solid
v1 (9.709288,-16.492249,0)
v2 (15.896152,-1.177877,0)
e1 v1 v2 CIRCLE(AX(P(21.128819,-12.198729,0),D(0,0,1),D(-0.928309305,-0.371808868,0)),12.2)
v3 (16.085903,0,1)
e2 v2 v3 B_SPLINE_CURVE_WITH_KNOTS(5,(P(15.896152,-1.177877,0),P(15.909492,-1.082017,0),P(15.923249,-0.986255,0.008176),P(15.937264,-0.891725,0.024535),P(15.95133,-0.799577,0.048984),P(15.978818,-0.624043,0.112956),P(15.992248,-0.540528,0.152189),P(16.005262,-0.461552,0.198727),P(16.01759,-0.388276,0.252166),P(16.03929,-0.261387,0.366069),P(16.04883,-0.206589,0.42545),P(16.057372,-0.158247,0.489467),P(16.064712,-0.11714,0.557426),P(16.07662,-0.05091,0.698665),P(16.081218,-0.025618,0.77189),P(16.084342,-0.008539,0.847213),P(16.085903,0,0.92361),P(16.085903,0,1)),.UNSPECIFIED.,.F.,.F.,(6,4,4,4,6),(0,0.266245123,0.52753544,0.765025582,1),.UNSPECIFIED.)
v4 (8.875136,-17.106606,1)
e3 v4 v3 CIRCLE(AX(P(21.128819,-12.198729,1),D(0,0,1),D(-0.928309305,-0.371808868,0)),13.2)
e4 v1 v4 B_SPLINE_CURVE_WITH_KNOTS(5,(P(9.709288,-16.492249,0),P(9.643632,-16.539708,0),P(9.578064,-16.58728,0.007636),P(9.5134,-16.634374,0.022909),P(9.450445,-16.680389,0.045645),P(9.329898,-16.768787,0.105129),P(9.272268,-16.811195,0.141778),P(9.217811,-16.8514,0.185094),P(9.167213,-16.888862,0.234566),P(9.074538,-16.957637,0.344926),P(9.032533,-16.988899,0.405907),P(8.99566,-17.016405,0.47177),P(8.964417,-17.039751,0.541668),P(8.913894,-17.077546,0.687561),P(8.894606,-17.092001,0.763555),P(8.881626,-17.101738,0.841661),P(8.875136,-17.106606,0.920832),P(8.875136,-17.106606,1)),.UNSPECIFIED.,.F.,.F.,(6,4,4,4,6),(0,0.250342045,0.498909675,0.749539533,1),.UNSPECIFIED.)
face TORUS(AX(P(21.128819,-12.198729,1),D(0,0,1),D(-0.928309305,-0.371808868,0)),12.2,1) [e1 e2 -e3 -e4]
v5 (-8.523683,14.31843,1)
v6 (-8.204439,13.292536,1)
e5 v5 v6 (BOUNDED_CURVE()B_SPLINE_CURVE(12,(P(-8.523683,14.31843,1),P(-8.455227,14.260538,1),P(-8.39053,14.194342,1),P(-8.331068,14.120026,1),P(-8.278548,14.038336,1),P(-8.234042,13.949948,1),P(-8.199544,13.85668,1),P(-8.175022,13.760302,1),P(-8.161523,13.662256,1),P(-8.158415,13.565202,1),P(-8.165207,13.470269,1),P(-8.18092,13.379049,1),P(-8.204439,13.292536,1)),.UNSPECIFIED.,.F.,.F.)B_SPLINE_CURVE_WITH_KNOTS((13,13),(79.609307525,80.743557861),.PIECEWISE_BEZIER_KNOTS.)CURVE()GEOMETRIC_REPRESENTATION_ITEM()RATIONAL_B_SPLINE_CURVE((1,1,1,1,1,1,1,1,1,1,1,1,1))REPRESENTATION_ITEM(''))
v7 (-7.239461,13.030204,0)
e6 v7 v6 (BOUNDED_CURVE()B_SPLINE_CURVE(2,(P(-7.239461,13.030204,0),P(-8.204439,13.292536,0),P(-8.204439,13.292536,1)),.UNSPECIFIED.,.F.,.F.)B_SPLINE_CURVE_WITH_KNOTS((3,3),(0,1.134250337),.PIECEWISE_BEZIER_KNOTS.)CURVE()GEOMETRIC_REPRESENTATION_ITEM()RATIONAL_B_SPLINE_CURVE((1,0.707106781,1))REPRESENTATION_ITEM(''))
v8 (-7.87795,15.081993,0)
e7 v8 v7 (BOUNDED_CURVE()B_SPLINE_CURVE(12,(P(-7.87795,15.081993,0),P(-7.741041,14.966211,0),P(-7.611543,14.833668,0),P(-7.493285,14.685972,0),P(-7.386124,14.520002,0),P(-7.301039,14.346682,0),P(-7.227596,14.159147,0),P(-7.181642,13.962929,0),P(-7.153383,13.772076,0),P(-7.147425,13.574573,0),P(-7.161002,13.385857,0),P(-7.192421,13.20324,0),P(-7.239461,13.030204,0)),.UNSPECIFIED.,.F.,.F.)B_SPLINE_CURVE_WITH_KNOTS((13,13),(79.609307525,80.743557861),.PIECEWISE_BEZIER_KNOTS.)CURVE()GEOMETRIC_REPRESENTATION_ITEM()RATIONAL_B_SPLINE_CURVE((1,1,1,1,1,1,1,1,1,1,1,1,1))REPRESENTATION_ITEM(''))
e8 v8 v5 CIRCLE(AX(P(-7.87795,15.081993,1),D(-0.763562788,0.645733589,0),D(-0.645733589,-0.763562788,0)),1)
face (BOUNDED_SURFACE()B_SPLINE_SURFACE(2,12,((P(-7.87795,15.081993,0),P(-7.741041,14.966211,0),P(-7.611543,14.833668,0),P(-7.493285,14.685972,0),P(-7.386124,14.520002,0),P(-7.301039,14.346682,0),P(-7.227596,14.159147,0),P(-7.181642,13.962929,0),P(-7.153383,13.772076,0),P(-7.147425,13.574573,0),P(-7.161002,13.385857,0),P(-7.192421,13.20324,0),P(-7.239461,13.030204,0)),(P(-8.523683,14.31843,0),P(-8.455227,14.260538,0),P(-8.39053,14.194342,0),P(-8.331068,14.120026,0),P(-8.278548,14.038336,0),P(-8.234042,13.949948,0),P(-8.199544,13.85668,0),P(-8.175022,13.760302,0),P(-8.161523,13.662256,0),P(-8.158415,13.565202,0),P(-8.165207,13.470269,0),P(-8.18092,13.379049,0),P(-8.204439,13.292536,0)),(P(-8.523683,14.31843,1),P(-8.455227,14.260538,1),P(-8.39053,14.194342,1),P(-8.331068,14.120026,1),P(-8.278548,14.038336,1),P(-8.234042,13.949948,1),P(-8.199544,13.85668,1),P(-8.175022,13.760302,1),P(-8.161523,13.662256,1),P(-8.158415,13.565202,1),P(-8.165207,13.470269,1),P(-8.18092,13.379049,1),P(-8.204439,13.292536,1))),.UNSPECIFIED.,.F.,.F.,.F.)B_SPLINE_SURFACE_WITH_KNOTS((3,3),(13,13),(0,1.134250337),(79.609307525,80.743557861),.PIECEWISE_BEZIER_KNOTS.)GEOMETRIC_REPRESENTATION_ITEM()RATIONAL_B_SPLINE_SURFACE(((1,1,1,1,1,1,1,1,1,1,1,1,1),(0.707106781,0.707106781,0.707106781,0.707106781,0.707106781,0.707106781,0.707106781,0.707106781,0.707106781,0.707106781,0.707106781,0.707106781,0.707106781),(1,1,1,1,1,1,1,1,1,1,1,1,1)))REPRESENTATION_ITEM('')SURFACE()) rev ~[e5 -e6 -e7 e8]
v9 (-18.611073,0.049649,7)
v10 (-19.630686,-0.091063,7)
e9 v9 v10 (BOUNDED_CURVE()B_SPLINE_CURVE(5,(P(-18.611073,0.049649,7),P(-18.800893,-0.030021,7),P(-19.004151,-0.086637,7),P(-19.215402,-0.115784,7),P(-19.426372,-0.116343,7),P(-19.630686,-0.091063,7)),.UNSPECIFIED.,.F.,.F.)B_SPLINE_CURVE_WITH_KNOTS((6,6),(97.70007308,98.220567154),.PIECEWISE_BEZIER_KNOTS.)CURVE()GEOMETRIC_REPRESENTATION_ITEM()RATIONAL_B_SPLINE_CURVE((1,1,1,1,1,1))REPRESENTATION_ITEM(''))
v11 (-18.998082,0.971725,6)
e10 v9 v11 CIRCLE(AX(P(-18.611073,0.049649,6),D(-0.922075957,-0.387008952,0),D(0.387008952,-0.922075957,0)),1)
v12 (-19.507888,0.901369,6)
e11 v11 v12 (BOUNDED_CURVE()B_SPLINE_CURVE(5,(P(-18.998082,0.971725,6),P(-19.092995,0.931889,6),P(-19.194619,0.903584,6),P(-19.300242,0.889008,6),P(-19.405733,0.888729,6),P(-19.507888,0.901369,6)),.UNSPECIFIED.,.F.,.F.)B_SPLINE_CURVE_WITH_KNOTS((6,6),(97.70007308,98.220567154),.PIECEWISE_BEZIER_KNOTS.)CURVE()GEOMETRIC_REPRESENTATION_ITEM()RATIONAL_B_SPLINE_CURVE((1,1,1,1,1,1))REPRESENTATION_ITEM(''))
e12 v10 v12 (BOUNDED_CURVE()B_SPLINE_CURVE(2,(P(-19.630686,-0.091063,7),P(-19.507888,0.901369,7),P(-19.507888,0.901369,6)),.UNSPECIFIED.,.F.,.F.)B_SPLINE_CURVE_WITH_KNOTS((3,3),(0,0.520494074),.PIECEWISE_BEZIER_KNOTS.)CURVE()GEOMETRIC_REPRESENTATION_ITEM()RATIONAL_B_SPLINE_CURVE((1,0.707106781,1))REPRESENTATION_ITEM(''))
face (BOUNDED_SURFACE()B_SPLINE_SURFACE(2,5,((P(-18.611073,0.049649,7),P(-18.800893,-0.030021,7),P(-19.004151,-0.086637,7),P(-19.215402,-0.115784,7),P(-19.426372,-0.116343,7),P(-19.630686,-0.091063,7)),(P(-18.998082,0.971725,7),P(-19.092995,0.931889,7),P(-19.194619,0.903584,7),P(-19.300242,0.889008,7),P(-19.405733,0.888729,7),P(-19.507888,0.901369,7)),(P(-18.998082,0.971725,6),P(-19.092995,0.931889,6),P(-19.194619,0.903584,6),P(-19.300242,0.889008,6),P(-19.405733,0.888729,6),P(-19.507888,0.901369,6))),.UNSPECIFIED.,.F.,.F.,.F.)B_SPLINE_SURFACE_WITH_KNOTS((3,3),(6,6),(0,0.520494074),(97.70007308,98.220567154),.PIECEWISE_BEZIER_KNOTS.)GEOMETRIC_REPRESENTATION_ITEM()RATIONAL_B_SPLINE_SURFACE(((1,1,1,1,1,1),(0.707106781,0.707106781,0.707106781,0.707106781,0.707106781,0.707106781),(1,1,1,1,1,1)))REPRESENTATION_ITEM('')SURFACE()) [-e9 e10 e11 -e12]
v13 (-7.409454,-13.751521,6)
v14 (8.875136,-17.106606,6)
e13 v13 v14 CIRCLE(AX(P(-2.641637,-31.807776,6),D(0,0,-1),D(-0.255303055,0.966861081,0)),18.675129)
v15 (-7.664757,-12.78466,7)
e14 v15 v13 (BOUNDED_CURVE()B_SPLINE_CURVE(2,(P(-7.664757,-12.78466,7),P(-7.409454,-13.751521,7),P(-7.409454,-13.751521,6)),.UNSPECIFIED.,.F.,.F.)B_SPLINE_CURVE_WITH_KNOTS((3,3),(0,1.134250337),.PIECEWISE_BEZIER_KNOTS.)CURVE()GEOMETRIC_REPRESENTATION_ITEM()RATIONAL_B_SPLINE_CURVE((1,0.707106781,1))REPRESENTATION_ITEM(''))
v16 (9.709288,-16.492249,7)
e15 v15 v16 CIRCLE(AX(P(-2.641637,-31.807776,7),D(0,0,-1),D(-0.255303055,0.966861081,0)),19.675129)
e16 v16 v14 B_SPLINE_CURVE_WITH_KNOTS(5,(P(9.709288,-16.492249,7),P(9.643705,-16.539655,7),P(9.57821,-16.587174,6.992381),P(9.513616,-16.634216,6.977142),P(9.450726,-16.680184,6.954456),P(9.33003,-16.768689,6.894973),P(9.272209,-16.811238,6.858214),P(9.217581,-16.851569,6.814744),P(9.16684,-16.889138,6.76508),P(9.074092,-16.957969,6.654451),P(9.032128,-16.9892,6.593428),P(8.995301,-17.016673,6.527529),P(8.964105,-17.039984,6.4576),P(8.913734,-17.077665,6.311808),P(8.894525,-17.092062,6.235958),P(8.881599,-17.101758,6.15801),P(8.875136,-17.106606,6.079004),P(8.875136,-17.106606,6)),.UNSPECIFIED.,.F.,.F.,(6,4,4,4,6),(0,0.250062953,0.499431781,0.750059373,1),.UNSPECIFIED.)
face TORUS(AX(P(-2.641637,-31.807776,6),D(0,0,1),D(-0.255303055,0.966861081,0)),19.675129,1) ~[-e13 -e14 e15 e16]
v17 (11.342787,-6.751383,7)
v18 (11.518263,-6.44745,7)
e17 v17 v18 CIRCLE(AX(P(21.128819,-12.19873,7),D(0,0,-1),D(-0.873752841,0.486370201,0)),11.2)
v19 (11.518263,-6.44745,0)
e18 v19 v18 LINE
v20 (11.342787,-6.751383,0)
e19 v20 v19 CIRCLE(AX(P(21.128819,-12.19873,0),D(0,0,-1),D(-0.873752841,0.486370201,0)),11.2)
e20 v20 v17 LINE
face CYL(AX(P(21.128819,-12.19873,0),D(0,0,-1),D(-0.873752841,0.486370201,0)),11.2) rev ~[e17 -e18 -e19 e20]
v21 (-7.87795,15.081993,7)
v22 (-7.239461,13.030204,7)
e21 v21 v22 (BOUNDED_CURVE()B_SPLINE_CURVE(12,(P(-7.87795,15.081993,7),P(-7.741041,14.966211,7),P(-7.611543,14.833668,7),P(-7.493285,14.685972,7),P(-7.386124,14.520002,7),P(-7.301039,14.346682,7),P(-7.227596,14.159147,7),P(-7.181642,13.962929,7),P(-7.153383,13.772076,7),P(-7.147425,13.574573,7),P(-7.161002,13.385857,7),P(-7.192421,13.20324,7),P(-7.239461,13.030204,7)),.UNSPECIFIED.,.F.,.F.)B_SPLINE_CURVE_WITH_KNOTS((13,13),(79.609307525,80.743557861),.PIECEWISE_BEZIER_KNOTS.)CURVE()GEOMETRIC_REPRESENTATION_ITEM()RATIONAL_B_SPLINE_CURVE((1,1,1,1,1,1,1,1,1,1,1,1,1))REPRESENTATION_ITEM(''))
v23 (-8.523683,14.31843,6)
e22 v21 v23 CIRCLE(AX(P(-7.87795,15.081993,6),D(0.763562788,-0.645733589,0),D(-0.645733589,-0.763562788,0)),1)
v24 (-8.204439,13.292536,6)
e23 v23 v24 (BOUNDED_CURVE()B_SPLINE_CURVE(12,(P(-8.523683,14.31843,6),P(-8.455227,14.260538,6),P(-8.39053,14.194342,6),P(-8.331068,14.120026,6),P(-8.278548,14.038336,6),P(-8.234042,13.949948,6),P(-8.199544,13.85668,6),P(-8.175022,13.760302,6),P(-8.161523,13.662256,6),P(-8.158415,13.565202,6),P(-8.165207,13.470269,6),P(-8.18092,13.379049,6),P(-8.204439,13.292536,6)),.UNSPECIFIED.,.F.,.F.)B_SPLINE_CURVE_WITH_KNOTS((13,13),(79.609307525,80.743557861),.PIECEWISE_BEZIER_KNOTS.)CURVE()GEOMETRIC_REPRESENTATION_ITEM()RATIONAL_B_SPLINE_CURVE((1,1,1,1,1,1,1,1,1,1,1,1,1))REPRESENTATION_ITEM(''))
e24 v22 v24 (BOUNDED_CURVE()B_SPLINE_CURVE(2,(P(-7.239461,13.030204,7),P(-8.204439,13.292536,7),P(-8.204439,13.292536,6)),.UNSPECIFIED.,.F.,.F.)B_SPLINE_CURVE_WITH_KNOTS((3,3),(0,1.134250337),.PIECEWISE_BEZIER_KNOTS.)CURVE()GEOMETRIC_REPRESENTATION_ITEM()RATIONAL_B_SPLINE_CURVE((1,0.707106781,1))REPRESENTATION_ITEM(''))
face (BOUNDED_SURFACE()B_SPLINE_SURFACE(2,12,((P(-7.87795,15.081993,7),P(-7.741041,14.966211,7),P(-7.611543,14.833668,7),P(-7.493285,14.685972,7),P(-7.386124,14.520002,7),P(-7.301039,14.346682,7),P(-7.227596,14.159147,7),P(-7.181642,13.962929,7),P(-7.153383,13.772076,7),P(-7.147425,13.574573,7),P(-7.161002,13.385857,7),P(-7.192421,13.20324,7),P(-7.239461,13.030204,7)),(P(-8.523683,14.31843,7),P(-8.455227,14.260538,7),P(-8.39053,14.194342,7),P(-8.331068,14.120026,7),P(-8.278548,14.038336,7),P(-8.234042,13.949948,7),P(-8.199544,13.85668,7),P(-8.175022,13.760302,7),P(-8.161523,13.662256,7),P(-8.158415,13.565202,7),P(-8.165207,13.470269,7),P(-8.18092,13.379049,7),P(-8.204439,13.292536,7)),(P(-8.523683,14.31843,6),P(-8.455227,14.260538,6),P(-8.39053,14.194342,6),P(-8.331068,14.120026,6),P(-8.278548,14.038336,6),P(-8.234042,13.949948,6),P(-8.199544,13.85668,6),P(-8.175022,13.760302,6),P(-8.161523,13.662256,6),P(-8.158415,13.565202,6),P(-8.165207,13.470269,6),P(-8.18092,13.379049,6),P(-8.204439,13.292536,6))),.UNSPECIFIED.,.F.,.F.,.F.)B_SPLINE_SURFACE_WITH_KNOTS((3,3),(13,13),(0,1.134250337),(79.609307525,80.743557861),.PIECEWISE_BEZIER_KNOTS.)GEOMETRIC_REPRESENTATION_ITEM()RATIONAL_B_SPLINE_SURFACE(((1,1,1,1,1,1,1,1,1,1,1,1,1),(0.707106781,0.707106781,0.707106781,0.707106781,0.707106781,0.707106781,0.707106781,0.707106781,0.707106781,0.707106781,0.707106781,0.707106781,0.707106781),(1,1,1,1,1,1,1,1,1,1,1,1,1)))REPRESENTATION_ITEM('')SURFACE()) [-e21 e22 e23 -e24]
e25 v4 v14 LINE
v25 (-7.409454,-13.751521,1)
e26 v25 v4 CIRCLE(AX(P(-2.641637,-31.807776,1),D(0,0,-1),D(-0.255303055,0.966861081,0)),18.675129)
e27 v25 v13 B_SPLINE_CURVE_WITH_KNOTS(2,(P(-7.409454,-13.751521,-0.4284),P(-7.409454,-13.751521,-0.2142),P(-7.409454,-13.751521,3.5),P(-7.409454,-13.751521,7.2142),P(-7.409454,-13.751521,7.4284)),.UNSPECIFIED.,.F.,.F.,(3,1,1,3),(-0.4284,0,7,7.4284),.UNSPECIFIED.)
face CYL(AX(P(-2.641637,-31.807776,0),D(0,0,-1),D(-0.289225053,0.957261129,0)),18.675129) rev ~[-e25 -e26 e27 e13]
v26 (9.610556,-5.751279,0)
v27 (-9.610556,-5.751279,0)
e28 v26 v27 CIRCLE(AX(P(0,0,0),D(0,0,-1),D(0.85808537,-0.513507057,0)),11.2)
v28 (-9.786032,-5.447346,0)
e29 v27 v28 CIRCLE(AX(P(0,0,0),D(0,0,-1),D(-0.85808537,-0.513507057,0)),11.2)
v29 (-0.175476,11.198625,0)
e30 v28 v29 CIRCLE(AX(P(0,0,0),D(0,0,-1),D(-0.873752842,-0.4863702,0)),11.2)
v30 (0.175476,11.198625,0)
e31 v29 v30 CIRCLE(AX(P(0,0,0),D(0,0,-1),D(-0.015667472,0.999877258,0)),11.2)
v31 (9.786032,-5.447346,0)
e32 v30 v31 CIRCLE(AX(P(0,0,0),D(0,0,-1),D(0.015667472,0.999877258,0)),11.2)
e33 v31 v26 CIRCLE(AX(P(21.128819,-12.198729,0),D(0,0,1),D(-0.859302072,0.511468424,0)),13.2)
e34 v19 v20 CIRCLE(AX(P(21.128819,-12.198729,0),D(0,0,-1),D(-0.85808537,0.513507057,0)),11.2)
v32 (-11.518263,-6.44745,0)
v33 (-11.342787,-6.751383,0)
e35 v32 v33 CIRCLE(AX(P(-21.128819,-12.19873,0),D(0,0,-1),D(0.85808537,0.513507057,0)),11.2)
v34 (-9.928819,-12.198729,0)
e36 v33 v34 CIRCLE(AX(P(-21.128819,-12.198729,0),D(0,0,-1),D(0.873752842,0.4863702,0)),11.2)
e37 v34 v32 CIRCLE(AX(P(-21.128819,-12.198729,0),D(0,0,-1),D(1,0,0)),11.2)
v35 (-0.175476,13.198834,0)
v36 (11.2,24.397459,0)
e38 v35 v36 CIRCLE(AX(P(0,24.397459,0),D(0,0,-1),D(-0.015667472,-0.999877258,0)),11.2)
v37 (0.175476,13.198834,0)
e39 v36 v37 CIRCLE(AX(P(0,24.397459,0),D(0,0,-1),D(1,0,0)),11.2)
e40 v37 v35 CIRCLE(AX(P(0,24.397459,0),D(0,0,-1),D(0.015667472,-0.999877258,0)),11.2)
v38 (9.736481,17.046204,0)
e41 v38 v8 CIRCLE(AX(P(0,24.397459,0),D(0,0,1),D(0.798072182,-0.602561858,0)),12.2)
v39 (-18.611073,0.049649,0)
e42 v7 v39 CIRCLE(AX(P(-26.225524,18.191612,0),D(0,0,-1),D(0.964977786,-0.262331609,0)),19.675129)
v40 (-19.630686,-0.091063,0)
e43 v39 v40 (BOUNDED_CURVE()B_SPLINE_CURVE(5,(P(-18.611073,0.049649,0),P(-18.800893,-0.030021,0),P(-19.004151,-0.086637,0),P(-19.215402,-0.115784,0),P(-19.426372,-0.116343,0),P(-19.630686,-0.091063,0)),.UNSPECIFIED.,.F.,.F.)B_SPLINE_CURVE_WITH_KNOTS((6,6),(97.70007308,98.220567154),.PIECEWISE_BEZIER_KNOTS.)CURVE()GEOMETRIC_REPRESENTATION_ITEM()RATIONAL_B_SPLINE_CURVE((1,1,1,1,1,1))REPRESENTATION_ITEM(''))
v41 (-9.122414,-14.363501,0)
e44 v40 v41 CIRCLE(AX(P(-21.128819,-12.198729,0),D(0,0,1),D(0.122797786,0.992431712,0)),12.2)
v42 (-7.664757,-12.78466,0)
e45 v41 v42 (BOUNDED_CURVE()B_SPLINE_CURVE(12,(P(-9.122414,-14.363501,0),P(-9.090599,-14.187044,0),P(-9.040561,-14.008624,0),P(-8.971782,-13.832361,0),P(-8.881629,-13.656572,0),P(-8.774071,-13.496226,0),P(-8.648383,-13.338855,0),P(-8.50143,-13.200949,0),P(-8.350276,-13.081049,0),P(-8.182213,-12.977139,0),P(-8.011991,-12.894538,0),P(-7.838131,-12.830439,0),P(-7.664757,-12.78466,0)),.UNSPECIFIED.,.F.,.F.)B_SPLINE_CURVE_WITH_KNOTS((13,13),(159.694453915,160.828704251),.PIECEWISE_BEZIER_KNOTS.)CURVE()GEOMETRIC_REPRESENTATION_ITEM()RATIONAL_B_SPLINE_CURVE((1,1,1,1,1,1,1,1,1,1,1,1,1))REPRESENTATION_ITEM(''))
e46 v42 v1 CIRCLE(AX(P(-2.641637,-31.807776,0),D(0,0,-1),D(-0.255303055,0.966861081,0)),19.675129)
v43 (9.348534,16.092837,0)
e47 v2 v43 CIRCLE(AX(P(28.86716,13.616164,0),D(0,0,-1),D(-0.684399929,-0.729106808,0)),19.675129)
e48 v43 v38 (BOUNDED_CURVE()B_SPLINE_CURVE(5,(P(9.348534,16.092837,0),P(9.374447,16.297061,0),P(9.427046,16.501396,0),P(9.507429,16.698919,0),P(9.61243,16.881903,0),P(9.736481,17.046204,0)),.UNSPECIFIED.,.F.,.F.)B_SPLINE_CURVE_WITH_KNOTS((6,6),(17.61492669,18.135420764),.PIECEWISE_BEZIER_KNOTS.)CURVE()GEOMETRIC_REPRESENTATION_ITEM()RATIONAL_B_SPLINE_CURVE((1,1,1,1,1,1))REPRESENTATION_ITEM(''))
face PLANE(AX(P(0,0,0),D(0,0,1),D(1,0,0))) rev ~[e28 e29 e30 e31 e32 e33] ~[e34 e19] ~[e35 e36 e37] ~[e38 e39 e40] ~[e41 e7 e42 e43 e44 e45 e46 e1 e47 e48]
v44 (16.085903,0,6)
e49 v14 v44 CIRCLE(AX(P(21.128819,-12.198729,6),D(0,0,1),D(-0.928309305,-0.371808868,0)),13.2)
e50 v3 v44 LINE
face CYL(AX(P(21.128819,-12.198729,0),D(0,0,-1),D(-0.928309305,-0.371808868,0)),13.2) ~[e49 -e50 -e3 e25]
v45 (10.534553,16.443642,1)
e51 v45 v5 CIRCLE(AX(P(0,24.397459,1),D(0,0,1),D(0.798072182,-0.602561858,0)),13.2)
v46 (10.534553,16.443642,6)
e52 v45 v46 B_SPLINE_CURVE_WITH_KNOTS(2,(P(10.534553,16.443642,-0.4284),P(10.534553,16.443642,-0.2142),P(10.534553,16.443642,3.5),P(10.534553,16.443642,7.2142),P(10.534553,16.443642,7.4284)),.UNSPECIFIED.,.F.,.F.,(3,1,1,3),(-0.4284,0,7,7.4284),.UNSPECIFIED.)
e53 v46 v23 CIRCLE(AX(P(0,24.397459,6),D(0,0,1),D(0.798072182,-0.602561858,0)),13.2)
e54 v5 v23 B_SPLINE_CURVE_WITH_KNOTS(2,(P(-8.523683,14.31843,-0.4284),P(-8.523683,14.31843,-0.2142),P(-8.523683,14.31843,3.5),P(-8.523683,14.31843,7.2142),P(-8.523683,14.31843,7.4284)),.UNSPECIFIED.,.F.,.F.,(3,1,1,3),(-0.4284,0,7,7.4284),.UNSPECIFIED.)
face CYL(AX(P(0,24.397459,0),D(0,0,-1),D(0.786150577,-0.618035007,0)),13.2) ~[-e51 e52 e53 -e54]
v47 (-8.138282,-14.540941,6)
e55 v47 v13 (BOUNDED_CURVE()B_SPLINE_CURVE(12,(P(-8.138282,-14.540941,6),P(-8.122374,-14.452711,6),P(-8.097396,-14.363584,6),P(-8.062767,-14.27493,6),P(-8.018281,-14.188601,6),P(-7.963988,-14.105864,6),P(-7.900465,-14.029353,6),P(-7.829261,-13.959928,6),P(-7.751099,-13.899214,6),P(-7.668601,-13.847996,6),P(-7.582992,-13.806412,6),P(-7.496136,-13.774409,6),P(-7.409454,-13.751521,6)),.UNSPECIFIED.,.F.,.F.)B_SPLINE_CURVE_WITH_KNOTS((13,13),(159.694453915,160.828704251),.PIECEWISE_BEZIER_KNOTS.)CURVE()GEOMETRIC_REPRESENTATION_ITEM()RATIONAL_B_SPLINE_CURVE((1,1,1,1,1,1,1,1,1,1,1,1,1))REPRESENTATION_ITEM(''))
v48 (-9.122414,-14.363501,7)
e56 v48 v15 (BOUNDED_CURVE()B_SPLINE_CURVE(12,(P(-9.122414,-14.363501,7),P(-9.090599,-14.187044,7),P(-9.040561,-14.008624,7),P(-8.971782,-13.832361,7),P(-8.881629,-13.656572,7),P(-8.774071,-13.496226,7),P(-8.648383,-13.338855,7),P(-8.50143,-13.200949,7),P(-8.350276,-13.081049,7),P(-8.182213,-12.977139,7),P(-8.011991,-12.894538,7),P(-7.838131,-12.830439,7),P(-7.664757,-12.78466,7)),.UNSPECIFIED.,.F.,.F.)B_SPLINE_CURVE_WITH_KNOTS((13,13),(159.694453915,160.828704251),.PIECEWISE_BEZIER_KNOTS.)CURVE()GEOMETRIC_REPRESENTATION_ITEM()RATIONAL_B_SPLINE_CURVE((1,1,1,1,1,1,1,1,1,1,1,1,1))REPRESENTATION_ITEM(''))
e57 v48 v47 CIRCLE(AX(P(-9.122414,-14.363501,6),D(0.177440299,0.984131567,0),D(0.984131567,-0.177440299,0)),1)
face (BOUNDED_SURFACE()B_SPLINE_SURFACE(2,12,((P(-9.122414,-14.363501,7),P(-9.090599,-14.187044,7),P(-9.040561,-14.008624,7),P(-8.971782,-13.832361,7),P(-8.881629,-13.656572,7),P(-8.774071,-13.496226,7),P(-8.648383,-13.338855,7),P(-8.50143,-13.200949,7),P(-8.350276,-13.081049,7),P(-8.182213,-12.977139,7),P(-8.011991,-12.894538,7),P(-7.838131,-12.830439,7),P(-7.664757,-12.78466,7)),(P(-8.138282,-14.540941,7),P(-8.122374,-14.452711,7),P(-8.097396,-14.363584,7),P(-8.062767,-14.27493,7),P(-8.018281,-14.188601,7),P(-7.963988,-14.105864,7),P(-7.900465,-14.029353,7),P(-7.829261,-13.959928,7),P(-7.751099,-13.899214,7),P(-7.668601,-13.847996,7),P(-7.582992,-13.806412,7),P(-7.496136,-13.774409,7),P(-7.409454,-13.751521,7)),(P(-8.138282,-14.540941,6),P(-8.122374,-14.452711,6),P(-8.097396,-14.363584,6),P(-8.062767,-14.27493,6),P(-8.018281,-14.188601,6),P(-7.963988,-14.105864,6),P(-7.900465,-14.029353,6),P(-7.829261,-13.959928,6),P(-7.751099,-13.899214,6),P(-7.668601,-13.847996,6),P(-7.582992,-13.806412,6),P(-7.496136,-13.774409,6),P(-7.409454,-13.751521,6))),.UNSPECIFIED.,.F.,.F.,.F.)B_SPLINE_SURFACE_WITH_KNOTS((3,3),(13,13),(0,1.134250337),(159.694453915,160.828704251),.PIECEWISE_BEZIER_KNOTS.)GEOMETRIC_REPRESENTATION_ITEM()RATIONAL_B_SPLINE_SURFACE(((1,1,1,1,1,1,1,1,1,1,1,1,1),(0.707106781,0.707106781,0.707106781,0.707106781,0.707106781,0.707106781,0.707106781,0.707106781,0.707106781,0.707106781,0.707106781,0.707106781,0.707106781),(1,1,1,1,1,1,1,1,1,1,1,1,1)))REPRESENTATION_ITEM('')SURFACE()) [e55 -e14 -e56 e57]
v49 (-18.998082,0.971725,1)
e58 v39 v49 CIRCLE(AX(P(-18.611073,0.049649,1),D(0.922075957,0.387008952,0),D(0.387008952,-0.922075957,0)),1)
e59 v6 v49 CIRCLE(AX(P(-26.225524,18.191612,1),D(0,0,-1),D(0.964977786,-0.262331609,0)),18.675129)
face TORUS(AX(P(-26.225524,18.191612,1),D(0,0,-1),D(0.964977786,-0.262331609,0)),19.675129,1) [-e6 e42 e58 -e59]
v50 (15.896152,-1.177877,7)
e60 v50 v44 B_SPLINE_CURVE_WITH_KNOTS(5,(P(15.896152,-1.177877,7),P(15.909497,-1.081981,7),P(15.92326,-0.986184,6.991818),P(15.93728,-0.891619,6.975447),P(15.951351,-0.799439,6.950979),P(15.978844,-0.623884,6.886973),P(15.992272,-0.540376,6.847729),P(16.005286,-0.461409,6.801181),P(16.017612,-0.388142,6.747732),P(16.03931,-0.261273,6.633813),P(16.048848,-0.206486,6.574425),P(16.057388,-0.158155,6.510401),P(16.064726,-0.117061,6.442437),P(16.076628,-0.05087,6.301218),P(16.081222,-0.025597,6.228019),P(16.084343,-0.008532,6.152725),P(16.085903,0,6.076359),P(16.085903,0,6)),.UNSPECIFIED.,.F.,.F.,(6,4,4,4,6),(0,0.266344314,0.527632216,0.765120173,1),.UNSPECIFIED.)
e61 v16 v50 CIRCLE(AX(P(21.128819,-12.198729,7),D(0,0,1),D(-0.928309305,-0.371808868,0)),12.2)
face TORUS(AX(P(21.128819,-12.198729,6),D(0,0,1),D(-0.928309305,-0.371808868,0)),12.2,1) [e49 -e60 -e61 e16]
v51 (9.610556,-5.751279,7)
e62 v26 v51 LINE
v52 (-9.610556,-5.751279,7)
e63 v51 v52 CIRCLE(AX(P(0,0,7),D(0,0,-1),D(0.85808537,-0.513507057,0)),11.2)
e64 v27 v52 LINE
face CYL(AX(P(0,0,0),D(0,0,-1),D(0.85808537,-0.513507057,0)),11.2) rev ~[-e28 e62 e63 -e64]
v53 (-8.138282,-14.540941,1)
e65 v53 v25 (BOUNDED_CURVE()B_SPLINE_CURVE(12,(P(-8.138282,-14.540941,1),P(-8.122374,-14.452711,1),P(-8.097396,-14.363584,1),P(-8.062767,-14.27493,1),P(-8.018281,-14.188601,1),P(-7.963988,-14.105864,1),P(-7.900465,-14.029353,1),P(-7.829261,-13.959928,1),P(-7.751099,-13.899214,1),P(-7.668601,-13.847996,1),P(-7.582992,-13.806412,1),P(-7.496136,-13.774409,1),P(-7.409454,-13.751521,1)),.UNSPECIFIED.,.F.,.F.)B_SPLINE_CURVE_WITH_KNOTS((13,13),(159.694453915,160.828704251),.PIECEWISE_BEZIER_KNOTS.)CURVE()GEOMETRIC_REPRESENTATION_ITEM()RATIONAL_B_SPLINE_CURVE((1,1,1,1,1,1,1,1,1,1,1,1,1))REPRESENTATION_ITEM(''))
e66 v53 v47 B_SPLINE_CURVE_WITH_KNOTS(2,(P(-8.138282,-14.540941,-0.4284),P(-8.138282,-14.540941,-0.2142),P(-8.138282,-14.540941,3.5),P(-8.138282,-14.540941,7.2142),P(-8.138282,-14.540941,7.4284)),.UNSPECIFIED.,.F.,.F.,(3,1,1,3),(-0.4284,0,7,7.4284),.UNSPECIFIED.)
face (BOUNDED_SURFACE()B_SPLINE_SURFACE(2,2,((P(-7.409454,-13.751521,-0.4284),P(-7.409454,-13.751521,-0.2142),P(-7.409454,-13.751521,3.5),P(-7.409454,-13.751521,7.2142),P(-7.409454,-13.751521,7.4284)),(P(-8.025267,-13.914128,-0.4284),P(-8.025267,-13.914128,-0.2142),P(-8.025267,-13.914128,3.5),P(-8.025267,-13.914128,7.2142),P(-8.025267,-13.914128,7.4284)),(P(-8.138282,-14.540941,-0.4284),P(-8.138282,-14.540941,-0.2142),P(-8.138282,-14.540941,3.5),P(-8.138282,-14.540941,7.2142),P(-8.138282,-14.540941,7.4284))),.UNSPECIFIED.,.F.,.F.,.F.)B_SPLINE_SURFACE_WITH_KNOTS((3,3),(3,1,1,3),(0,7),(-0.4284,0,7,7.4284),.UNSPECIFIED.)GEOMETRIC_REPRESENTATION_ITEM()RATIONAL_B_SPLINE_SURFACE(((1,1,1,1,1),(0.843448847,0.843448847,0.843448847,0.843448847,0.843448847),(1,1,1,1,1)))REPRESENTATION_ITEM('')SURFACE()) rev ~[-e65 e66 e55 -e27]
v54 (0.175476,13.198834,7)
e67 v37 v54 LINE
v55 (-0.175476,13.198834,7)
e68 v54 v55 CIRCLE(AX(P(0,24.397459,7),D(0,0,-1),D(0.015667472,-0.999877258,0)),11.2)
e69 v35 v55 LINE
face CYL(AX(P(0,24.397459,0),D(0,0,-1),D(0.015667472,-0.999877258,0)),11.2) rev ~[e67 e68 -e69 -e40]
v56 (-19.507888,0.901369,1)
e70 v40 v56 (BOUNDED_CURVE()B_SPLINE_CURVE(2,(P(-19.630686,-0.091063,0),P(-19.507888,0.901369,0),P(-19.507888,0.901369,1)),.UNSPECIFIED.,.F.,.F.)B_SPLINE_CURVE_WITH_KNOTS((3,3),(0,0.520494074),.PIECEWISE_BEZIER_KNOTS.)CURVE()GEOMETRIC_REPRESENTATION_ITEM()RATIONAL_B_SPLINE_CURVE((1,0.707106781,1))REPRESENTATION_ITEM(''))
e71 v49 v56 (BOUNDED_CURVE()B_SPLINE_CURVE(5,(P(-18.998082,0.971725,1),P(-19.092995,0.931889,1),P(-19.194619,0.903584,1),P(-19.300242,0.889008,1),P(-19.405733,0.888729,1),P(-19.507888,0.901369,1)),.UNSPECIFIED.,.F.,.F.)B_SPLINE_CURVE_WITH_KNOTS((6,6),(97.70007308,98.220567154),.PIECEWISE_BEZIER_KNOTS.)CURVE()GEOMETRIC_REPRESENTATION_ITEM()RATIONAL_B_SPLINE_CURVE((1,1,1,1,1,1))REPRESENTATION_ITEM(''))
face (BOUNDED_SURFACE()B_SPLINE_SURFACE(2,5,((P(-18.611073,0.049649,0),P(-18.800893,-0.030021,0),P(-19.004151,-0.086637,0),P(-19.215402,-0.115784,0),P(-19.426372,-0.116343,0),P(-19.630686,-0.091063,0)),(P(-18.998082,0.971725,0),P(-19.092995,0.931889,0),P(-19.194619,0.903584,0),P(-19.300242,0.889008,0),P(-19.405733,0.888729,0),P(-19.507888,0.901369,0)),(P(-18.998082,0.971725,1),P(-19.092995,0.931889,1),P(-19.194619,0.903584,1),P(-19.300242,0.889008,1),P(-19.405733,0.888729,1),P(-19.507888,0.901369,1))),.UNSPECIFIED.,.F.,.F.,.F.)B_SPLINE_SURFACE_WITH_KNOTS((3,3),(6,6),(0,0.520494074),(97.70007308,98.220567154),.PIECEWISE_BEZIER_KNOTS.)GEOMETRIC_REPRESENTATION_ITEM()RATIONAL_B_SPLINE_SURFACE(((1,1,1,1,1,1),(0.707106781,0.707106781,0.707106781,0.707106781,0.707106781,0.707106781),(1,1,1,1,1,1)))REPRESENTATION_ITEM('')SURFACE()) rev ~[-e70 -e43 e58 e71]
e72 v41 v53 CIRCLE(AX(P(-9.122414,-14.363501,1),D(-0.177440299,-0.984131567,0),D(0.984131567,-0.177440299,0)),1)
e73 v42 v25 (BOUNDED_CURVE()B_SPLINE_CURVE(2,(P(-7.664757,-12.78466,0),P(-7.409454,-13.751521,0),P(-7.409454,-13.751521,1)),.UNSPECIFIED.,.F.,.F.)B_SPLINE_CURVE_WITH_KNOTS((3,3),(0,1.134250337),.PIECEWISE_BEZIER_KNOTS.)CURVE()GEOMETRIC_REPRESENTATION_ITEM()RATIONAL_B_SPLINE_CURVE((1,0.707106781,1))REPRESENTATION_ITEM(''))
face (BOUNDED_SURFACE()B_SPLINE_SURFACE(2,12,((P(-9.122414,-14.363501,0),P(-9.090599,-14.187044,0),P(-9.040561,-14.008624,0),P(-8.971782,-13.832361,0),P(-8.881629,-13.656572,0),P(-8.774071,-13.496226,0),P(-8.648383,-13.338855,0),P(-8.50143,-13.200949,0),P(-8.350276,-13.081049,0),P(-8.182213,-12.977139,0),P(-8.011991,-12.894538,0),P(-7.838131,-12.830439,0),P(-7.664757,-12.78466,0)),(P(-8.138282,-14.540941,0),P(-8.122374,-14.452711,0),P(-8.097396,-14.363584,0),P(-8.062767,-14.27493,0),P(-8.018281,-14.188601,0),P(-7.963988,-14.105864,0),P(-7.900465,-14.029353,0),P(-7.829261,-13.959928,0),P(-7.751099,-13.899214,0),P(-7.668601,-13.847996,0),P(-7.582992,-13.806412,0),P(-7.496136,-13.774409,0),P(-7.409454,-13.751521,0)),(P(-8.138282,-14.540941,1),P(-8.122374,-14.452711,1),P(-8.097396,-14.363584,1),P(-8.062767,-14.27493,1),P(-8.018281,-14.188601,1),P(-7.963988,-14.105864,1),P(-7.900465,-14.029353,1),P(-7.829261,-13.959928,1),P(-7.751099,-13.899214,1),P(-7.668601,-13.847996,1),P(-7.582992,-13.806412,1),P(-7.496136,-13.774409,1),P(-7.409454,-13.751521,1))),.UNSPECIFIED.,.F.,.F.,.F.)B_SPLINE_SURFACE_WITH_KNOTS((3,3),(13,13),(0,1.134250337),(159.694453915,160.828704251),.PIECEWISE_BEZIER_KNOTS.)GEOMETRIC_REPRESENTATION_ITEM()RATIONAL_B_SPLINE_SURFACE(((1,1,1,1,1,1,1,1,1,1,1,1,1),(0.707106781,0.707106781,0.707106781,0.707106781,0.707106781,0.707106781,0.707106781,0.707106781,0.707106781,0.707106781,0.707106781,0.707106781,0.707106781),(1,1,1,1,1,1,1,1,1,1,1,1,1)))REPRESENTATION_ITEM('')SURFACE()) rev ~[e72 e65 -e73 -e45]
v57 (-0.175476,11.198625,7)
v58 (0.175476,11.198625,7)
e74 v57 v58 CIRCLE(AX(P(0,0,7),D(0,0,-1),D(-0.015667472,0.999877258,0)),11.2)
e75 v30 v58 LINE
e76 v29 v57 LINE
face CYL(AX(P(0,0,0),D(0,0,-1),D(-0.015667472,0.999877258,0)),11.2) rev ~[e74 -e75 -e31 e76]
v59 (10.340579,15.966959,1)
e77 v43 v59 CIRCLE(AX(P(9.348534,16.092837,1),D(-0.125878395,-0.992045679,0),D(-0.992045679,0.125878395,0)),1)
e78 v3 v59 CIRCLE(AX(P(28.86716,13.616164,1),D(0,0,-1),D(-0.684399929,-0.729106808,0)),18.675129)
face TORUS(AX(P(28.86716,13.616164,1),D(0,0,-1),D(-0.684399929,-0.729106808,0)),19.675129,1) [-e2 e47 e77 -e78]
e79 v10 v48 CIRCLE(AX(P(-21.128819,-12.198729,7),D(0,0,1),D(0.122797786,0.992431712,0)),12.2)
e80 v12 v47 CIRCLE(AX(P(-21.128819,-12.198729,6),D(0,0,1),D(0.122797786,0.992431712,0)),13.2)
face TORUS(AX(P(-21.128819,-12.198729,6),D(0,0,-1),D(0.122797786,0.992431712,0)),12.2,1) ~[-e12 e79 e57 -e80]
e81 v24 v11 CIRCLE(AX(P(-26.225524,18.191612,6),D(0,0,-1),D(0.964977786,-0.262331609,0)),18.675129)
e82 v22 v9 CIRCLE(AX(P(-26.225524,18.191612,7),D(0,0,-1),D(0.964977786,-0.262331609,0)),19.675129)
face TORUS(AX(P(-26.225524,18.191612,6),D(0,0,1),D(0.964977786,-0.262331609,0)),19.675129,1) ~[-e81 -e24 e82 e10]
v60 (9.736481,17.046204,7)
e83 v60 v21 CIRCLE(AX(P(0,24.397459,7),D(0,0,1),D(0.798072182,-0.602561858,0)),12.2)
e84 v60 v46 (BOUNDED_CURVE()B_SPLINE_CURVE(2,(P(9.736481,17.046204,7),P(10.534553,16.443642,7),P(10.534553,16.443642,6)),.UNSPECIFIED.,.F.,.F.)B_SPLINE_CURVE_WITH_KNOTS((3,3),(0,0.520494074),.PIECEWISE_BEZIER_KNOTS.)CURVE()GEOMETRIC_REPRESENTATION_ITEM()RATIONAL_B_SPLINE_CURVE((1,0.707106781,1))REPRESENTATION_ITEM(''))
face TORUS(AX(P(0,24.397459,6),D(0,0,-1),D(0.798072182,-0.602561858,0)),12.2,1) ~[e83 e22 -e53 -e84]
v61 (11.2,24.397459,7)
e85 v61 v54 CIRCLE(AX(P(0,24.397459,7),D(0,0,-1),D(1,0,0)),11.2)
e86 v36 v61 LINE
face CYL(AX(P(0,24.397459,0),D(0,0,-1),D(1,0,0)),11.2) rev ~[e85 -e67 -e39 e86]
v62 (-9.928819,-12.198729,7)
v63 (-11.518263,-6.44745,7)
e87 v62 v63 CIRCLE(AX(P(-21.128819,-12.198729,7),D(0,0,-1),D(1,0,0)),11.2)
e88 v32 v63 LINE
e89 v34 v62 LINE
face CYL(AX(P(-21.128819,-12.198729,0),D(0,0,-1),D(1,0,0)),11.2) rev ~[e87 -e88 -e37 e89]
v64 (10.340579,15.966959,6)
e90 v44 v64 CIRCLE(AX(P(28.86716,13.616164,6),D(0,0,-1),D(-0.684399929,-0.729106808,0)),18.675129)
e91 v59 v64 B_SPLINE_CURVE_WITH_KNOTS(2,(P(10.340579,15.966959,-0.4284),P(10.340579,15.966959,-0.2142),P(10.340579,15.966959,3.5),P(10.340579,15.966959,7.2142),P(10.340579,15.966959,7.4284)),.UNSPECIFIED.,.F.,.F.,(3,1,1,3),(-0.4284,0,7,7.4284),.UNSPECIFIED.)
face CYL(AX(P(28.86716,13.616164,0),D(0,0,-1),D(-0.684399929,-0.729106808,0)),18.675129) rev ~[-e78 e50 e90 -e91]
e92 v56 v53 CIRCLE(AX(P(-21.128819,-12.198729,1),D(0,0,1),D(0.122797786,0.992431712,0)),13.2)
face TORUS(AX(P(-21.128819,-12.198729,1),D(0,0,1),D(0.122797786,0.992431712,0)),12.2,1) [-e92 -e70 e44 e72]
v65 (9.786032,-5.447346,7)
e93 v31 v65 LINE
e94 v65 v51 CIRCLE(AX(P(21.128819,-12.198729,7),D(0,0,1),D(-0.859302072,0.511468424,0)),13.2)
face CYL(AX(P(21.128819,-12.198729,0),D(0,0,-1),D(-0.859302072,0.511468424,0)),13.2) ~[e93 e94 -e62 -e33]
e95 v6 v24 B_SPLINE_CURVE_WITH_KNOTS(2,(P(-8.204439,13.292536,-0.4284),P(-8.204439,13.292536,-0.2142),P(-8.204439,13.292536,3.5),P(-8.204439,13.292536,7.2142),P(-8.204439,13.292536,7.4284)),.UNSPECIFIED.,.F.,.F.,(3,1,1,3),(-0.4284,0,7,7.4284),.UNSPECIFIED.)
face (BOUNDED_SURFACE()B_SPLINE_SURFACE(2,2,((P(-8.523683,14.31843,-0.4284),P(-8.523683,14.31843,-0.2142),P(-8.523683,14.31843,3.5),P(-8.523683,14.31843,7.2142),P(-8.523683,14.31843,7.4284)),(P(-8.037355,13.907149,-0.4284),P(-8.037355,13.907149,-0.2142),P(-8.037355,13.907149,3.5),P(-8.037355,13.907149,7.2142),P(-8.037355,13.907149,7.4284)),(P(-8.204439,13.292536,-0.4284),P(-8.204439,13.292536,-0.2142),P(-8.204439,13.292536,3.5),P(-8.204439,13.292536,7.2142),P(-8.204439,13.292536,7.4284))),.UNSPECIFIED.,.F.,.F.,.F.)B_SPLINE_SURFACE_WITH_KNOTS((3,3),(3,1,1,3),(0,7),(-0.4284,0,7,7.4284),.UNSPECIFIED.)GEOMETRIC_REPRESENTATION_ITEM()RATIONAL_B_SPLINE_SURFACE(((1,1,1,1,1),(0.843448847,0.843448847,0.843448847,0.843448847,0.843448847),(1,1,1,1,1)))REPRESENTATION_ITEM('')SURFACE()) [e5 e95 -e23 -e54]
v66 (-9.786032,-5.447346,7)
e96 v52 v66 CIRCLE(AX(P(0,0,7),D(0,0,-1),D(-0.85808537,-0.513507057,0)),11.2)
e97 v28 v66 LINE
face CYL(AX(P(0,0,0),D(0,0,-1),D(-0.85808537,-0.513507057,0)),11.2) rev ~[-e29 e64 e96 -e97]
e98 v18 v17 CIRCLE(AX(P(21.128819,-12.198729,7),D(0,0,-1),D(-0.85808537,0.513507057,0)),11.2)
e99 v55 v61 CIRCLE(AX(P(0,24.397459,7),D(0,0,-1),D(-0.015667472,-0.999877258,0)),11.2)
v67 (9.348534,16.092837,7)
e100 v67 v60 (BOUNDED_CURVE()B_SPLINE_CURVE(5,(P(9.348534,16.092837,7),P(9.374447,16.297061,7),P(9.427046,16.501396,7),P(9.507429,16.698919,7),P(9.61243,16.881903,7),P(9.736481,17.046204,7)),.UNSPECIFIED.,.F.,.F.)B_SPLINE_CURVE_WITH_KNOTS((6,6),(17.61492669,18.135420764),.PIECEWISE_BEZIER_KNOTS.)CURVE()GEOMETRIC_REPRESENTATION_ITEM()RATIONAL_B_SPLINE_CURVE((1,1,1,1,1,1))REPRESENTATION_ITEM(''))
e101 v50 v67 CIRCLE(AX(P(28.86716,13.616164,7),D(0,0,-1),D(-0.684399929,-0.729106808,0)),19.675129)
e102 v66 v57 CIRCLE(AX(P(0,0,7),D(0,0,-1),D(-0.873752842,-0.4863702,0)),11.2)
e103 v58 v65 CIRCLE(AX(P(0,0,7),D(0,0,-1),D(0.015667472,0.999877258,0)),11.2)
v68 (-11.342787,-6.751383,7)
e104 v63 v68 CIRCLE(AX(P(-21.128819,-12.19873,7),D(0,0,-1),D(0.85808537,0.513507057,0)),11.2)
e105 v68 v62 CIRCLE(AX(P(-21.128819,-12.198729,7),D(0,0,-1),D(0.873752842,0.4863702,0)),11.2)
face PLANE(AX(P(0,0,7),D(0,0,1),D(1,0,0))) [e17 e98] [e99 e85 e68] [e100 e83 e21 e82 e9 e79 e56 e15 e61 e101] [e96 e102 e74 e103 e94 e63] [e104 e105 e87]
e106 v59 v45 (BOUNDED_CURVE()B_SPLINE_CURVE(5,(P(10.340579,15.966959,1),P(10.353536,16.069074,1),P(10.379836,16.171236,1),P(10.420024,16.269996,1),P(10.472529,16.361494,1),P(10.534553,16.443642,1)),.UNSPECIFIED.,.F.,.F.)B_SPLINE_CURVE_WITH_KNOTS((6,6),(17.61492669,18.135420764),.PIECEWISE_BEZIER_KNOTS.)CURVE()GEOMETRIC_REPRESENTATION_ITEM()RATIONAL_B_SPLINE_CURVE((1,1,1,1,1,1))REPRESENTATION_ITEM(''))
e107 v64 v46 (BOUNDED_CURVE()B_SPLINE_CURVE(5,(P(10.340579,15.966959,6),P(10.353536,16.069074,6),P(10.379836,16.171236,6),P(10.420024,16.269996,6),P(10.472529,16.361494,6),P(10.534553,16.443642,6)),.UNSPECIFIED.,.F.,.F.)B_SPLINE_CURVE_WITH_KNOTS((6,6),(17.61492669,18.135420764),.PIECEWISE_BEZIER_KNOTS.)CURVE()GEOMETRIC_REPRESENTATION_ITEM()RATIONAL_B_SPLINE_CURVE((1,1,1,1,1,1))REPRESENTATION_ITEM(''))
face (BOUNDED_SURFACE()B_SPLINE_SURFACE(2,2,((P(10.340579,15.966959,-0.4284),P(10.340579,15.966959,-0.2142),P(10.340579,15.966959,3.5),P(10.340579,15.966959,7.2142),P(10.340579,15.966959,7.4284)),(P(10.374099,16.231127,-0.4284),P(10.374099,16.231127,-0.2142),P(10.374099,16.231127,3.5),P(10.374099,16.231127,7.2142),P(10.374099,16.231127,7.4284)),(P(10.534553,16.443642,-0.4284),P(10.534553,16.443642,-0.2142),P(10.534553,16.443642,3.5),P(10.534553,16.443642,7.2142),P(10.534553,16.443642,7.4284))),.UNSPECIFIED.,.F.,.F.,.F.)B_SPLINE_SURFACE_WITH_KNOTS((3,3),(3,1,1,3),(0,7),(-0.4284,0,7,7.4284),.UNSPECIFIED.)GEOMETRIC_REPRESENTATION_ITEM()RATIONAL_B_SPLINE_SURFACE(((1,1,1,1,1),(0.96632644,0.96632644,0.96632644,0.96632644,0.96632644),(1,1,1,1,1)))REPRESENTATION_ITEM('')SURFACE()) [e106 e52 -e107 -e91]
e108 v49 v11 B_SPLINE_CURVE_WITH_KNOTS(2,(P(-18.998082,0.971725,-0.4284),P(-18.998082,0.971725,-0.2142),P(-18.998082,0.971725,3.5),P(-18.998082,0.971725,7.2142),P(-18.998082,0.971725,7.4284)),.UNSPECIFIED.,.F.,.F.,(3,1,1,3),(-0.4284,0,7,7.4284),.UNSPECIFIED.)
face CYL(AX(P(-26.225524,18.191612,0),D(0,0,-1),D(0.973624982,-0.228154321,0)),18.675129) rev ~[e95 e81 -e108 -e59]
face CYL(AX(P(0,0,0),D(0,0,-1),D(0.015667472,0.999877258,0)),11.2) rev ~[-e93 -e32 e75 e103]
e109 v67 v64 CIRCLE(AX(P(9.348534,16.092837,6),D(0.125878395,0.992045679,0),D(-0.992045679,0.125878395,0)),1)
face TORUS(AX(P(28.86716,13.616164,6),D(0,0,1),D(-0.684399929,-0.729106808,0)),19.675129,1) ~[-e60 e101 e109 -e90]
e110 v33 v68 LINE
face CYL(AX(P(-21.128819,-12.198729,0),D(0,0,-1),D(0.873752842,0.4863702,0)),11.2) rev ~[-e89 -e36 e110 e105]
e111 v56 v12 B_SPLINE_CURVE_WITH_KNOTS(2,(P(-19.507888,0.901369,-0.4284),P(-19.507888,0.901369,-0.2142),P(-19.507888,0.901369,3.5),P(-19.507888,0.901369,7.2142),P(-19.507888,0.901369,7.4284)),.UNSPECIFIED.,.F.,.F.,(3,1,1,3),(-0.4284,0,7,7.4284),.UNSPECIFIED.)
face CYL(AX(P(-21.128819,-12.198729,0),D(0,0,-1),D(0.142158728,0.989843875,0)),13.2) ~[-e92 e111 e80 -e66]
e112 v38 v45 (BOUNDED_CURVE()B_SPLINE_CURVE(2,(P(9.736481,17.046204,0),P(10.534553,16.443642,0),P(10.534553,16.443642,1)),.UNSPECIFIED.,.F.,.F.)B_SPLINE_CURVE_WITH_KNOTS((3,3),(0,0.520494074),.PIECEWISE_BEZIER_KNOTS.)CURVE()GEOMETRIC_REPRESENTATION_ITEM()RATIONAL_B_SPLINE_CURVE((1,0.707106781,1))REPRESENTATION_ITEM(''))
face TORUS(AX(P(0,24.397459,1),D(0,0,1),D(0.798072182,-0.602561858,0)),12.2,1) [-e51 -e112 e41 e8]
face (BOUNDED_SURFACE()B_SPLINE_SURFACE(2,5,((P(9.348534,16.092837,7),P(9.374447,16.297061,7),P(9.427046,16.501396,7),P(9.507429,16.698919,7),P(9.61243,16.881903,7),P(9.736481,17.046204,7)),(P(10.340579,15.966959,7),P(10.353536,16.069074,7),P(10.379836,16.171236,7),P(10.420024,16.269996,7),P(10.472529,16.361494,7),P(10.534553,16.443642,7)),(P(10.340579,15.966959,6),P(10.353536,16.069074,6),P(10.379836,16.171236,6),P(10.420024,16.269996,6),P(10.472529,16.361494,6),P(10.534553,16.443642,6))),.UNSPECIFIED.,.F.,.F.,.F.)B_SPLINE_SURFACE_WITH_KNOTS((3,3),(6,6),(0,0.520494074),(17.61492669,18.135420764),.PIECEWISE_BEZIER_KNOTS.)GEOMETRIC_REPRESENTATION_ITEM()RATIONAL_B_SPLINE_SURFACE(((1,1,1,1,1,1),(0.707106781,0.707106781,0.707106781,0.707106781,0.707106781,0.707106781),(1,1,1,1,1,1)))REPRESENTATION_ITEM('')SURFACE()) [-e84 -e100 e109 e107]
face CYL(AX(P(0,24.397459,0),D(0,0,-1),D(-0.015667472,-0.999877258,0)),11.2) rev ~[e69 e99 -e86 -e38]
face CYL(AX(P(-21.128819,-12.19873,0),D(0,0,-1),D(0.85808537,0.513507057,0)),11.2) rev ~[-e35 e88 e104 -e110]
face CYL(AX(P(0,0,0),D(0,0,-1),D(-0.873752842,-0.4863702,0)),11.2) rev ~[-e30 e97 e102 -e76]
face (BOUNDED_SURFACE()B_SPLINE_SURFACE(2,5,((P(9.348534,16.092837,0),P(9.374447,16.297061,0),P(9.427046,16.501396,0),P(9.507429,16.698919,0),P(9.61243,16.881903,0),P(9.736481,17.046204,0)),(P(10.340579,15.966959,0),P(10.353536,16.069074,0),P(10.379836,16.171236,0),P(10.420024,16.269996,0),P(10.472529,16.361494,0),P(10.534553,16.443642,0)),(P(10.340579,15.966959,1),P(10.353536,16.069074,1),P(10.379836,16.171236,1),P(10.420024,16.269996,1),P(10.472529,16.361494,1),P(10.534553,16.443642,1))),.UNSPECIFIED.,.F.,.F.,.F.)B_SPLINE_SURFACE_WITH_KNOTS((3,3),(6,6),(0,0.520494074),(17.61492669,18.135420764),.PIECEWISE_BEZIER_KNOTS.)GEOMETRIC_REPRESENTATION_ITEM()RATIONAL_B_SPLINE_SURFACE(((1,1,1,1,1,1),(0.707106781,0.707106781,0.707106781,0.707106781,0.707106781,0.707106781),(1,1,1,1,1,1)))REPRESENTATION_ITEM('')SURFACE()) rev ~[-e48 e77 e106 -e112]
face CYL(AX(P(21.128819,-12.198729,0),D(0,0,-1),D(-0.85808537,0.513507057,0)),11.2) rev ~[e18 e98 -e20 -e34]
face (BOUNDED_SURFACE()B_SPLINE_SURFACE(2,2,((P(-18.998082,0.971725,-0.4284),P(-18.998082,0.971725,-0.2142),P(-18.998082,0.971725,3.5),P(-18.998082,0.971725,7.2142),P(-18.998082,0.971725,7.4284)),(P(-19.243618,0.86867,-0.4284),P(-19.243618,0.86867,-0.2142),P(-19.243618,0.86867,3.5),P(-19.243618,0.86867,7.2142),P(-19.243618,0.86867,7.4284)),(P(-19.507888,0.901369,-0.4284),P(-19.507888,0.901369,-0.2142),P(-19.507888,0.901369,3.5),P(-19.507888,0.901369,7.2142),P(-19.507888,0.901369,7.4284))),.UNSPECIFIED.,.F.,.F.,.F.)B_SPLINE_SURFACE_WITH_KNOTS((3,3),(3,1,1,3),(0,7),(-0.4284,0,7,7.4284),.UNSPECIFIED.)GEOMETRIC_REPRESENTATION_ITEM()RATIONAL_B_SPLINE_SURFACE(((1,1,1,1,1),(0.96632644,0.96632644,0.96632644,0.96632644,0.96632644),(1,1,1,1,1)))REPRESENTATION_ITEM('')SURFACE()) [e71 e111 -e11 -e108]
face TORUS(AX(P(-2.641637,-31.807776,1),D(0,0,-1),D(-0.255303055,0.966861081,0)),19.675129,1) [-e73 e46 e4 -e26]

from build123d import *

# Parameters (mm, degrees)
F1_DEPTH = 7
F2_F1_R  = 1
F2_F2_R  = 1


with BuildPart() as f1:
    # F0 (on Top) → F1 (new body)
    with BuildSketch(Plane.XY):
        with BuildLine():
            ThreePointArc((16.0859033521, 0), (11.2489324437, 7.4227405942), (10.3771876201, 16.2393967891))
            ThreePointArc((10.3771876201, 16.2393967891), (-1.6415139514, 37.4949942198), (-8.042951676, 13.9308009457))
            ThreePointArc((-8.042951676, 13.9308009457), (-12.0527481421, 6.0304909646), (-19.2523239715, 0.8672097043))
            ThreePointArc((-19.2523239715, 0.8672097043), (-31.6508605334, -20.1690898925), (-8.042951676, -13.9308009457))
            ThreePointArc((-8.042951676, -13.9308009457), (0.8038156984, -13.4532315587), (8.8751363515, -17.1066064934))
            ThreePointArc((8.8751363515, -17.1066064934), (33.2923744848, -17.3259043273), (16.0859033521, 0))
        make_face()
        with BuildLine():
            ThreePointArc((-11.3427873534, -6.7513831957), (-10.2880729766, -9.3847959344), (-9.9288191789, -12.1987294406))
            ThreePointArc((-9.9288191789, -12.1987294406), (-31.9241475391, -15.1821646408), (-11.5182630349, -6.4474503999))
            ThreePointArc((-11.5182630349, -6.4474503999), (-11.4293346565, -6.5987294406), (-11.3427873534, -6.7513831957))
        make_face(mode=Mode.SUBTRACT)
        with BuildLine():
            ThreePointArc((11.5182630349, -6.4474503999), (24.1122543791, -1.4034010803), (32.3288191789, -12.1987294406))
            ThreePointArc((32.3288191789, -12.1987294406), (18.3148856726, -23.0394756429), (11.3427873534, -6.7513831957))
            ThreePointArc((11.3427873534, -6.7513831957), (11.4293346565, -6.5987294406), (11.5182630349, -6.4474503999))
        make_face(mode=Mode.SUBTRACT)
        with BuildLine():
            ThreePointArc((0.1754756815, 11.1986252855), (9.6994845224, 5.6), (9.7860318255, -5.4473462448))
            ThreePointArc((9.7860318255, -5.4473462448), (9.6972838489, -5.5987294406), (9.610556144, -5.7512790407))
            ThreePointArc((9.610556144, -5.7512790407), (0, -11.2), (-9.610556144, -5.7512790407))
            ThreePointArc((-9.610556144, -5.7512790407), (-9.6994845224, -5.6), (-9.7860318255, -5.4473462448))
            ThreePointArc((-9.7860318255, -5.4473462448), (-9.6994845224, 5.6), (-0.1754756815, 11.1986252855))
            ThreePointArc((-0.1754756815, 11.1986252855), (0, 11.2), (0.1754756815, 11.1986252855))
        make_face(mode=Mode.SUBTRACT)
        with BuildLine():
            ThreePointArc((11.2, 24.3974588811), (7.9813948541, 16.540147879), (0.1754756815, 13.1988335956))
            ThreePointArc((0.1754756815, 13.1988335956), (0, 13.1974588811), (-0.1754756815, 13.1988335956))
            ThreePointArc((-0.1754756815, 13.1988335956), (-7.8573110021, 32.3788537352), (11.2, 24.3974588811))
        make_face(mode=Mode.SUBTRACT)
    extrude(amount=F1_DEPTH)

    # F2: fillet of radius 1 on 13 edges, made by hand

    # F2_f1
    f2_f1_edges = [f1.edges().sort_by_distance(p)[0] for p in [
        (-19.2523239715, 0.8672097043, 3.5),
        (-8.042951676, -13.9308009457, 3.5),
        (10.3771876201, 16.2393967891, 3.5),
        (-8.042951676, 13.9308009457, 3.5),
    ]]
    fillet(f2_f1_edges, radius=F2_F1_R)

    # F2_f2
    f2_f2_edges = [f1.edges().sort_by_distance(p)[0] for p in [
        (-1.4628843961, 37.5161466678, 7),
        (-12.1783667806, 5.8856047573, 7),
        (-31.7584938684, -20.0249683837, 7),
        (1.1268180842, -13.5168166887, 7),
        (33.2923744848, -17.3259043273, 7),
        (11.2949912973, 7.2932435583, 7),
        (-31.7584938684, -20.0249683837, 0),
        (-1.4628843961, 37.5161466678, 0),
        (33.2923744848, -17.3259043273, 0),
        (10.4063759445, 16.2179925947, 0),
        (-8.2145805341, 13.8519992281, 0),
        (-19.2483815575, 0.9031896319, 0),
        (-7.8888929577, -14.040035038, 0),
        (10.4063759445, 16.2179925947, 7),
        (-7.8888929577, -14.040035038, 7),
        (-19.2483815575, 0.9031896319, 7),
        (-8.2145805341, 13.8519992281, 7),
    ]]
    fillet(f2_f2_edges, radius=F2_F2_R)


solid = f1.part
